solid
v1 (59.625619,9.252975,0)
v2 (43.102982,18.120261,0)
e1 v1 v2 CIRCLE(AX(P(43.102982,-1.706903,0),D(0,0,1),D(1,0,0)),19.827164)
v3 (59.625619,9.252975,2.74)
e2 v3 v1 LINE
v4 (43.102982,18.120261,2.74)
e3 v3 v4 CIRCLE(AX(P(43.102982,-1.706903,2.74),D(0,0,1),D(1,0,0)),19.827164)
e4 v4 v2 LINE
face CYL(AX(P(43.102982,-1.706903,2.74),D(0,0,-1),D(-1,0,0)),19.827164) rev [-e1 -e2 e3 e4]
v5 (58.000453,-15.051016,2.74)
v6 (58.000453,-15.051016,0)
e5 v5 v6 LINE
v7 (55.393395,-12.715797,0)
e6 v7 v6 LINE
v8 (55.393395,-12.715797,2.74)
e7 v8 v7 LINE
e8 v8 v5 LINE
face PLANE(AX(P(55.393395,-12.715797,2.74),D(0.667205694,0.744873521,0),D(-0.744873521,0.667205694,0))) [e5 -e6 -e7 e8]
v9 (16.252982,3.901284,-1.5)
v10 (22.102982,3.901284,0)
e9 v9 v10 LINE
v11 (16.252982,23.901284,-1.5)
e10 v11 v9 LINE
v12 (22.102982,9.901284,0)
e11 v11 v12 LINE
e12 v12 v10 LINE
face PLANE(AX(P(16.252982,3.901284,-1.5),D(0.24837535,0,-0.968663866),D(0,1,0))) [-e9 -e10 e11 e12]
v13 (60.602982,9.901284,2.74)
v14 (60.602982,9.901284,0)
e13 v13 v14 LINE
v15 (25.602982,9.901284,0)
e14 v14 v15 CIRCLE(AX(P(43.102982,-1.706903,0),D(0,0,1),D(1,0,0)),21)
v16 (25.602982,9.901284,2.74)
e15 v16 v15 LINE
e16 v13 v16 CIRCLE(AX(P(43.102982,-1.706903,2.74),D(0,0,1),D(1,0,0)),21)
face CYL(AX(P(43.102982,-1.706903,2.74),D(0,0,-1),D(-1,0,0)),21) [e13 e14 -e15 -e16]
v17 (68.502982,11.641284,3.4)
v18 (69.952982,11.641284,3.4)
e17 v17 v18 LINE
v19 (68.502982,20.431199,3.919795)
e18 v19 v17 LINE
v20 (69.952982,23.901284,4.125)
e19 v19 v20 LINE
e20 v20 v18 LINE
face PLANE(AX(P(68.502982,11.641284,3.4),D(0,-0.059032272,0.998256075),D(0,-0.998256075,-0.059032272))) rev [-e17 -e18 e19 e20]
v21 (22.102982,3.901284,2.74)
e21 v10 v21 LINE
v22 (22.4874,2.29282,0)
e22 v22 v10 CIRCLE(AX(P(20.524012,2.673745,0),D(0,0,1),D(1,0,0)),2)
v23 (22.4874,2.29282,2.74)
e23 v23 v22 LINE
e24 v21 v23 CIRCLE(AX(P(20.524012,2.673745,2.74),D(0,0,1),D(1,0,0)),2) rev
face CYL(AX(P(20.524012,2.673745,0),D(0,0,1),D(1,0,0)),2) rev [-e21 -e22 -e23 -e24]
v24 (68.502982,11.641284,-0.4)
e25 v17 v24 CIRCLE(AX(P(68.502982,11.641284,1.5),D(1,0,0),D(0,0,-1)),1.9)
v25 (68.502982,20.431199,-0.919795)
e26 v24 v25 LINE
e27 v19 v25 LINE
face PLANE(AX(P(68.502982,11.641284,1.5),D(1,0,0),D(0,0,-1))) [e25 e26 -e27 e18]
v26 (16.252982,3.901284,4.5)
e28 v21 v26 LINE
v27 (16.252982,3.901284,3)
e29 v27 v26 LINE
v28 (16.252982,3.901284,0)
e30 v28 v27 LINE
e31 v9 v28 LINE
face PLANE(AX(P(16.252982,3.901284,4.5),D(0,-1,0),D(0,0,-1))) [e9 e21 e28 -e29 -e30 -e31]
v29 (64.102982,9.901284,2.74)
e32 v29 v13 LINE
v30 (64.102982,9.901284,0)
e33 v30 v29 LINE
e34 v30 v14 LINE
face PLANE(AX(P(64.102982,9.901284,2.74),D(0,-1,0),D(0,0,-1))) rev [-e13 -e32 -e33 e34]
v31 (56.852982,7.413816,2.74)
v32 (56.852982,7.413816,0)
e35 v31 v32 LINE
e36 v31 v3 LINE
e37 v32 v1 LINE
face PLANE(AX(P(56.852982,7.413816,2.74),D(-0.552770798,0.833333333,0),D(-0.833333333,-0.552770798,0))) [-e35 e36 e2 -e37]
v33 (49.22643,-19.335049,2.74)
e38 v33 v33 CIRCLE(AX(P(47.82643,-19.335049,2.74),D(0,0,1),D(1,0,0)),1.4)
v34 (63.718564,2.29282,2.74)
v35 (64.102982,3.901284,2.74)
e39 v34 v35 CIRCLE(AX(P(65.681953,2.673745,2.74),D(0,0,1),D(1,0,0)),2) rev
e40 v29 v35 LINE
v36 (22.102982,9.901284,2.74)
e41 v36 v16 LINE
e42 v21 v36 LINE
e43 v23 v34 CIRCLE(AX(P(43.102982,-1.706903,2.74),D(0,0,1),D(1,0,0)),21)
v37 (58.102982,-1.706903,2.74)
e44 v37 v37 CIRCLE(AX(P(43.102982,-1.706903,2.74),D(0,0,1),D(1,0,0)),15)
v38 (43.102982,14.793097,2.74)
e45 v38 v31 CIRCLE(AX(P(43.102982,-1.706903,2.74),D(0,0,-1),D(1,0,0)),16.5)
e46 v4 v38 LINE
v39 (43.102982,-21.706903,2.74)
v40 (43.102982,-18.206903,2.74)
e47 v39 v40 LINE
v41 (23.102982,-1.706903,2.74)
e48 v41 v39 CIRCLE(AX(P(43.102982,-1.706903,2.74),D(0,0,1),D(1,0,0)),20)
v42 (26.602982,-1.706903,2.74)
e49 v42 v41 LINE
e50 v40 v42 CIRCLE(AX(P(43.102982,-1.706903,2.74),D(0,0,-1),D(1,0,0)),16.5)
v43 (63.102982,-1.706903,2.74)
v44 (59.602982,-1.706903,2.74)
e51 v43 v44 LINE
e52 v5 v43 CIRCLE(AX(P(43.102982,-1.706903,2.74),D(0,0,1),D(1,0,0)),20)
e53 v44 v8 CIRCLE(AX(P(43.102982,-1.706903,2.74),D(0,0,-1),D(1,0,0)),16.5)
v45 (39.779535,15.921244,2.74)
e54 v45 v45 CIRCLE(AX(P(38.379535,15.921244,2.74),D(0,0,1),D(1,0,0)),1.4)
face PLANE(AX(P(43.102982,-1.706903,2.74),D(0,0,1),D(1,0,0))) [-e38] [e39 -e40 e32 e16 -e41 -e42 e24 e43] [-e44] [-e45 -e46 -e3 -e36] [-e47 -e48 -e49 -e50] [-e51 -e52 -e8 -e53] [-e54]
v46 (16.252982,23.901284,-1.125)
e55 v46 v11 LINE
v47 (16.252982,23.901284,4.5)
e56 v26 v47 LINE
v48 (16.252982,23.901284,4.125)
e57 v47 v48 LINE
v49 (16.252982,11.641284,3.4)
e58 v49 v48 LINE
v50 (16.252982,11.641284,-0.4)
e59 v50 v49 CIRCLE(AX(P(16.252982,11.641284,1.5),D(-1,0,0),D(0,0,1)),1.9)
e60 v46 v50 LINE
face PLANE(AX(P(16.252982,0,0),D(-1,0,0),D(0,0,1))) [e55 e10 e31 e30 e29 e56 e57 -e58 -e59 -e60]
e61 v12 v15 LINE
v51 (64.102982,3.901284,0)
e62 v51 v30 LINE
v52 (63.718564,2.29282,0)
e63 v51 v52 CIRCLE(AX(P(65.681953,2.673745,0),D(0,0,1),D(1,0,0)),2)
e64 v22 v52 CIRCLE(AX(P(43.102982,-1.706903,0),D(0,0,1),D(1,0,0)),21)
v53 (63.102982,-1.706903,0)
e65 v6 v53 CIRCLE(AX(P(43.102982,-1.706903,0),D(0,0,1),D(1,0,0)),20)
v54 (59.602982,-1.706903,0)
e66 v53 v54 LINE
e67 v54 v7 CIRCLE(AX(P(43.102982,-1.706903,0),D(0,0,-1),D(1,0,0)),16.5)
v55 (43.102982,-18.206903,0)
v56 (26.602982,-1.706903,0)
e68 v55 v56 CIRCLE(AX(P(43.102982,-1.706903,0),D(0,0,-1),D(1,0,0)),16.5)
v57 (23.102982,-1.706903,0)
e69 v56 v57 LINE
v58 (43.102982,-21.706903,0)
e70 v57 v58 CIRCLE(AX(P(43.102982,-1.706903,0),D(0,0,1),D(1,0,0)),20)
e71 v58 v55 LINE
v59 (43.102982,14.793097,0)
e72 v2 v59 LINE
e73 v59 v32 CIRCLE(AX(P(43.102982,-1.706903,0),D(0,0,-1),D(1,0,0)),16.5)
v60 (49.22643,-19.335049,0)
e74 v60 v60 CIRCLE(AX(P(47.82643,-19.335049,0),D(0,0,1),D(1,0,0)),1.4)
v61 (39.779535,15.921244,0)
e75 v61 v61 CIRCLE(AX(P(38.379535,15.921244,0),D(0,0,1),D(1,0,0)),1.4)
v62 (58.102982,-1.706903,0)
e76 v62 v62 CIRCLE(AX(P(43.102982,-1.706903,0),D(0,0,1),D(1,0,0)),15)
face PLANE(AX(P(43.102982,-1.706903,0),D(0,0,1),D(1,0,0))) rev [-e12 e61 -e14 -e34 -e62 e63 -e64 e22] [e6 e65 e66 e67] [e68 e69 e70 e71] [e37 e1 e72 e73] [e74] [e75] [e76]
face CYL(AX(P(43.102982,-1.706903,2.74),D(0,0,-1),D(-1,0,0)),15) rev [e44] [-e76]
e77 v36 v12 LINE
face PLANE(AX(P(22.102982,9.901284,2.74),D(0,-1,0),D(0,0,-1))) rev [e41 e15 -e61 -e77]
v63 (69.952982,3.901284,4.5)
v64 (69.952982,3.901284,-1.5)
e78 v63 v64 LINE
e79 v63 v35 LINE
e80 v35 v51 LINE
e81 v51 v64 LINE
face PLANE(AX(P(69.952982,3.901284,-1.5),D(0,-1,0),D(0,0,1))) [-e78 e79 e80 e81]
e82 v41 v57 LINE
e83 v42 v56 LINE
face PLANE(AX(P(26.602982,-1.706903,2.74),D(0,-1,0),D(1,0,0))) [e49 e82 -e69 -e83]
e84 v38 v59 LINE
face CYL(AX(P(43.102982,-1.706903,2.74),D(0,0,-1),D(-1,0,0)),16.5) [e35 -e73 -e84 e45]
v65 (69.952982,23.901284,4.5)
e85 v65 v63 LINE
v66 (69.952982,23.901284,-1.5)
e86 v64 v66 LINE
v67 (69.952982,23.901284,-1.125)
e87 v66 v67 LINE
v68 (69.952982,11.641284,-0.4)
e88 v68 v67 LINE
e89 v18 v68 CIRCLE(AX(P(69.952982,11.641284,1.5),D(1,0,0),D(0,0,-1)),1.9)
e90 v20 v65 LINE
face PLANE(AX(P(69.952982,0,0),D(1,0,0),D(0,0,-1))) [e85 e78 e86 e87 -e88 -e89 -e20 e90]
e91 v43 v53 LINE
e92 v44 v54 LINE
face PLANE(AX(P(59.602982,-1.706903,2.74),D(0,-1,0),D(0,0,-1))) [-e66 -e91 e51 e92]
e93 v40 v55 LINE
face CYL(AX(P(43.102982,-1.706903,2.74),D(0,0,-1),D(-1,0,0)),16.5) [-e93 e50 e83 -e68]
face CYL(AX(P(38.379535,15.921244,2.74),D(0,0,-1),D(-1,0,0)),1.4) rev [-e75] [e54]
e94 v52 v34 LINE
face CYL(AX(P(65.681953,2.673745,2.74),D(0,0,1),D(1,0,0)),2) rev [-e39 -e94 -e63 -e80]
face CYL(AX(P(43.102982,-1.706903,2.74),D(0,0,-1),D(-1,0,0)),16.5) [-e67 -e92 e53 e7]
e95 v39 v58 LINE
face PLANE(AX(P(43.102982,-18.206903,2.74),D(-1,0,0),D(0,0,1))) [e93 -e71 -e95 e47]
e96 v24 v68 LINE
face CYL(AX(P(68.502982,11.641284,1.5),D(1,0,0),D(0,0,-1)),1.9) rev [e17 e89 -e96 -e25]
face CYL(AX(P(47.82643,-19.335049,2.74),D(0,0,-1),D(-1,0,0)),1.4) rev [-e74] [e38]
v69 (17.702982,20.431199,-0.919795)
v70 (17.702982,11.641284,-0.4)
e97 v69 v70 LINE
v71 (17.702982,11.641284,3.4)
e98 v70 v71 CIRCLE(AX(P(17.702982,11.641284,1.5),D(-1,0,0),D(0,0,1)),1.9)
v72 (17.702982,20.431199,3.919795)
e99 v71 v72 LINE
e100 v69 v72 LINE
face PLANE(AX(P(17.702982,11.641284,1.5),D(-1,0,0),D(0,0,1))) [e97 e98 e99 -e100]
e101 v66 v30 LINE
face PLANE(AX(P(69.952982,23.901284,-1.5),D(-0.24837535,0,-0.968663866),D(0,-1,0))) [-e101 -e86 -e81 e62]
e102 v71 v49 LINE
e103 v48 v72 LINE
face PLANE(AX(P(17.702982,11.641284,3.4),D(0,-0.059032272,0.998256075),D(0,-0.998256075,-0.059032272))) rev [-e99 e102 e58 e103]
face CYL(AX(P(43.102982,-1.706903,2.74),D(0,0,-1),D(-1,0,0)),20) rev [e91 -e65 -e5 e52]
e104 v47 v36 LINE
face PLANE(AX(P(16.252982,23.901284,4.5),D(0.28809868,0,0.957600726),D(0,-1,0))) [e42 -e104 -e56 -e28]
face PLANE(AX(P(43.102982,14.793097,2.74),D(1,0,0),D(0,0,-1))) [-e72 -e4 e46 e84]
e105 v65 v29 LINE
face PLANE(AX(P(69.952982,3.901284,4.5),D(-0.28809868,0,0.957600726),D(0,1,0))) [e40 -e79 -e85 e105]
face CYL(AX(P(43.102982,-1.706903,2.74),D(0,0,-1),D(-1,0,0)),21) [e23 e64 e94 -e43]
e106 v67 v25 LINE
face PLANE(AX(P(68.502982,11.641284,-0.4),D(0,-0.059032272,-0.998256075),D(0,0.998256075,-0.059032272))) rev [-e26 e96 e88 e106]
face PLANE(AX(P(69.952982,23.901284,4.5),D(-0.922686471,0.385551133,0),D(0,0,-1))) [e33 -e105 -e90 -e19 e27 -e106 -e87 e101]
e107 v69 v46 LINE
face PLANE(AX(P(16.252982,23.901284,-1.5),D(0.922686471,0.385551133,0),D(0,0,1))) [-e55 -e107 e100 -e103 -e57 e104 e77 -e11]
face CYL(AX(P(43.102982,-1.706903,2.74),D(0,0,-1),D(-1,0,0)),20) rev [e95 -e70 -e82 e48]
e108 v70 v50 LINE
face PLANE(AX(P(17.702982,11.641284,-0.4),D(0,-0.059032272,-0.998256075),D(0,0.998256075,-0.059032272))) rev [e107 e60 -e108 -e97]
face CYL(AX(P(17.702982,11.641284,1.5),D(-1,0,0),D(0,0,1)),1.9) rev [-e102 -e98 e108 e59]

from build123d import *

# Parameters (mm, degrees)
SKETCH_1_R          = 15
SKETCH_1_R_2        = 1.4
EXTRUDE_1_DEPTH     = 2.74
SKETCH_3_W          = 2.74
SKETCH_3_H          = 6
EXTRUDE_3_DEPTH     = 3.5
SKETCH_11_W         = 2.74
SKETCH_11_H         = 6
EXTRUDE_8_DEPTH     = 3.5
FILLET_17_R         = 2
FILLET_19_R         = 2
CUT_EXTRUDE_1_DEPTH = 1.45
CUT_EXTRUDE_START   = -1.45
CUT_EXTRUDE_2_DEPTH = 1.45


with BuildPart() as part:
    # 草图1 → 凸台-拉伸1 (new body)
    with BuildSketch(Plane.XY):
        with BuildLine():
            Line((25.602982383, 9.901284161), (25.602982383, 3.901284161))
            Line((25.602982383, 3.901284161), (22.865684115, 3.901284161))
            ThreePointArc((22.865684115, 3.901284161), (43.102982383, -22.706902605), (63.340280651, 3.901284161))
            Line((63.340280651, 3.901284161), (60.602982383, 3.901284161))
            Line((60.602982383, 3.901284161), (60.602982383, 9.901284161))
            ThreePointArc((60.602982383, 9.901284161), (43.102982383, 19.293097395), (25.602982383, 9.901284161))
        make_face()
        with Locations((43.102982383, -1.706902605)):
            Circle(SKETCH_1_R, mode=Mode.SUBTRACT)
        with Locations((38.37953481, 15.921243725)):
            Circle(SKETCH_1_R_2, mode=Mode.SUBTRACT)
        with Locations((47.826429956, -19.335048935)):
            Circle(SKETCH_1_R_2, mode=Mode.SUBTRACT)
        with BuildLine():
            Line((26.602982383, -1.706902605), (23.102982383, -1.706902605))
            ThreePointArc((23.102982383, -1.706902605), (28.96084676, -15.849038229), (43.102982383, -21.706902605))
            Line((43.102982383, -21.706902605), (43.102982383, -18.206902605))
            ThreePointArc((43.102982383, -18.206902605), (31.435720494, -13.374164495), (26.602982383, -1.706902605))
        make_face(mode=Mode.SUBTRACT)
        with BuildLine():
            Line((43.102982383, 14.793097395), (43.102982383, 18.12026115))
            ThreePointArc((43.102982383, 18.12026115), (52.478832846, 15.763353566), (59.625618846, 9.252974534))
            Line((59.625618846, 9.252974534), (56.852982383, 7.413815568))
            ThreePointArc((56.852982383, 7.413815568), (50.905486793, 12.831698598), (43.102982383, 14.793097395))
        make_face(mode=Mode.SUBTRACT)
        with BuildLine():
            Line((55.393395475, -12.715796557), (58.000452797, -15.051016486))
            ThreePointArc((58.000452797, -15.051016486), (61.783847035, -8.850101879), (63.102982383, -1.706902605))
            Line((63.102982383, -1.706902605), (59.602982383, -1.706902605))
            ThreePointArc((59.602982383, -1.706902605), (58.514695721, -7.600042006), (55.393395475, -12.715796557))
        make_face(mode=Mode.SUBTRACT)
    extrude(amount=EXTRUDE_1_DEPTH)

    # 草图3 → 凸台-拉伸3 (add)
    with BuildSketch(Plane.ZY.offset(-25.602982383)):
        with Locations((1.37, 6.901284161)):
            Rectangle(SKETCH_3_W, SKETCH_3_H)
    extrude(amount=EXTRUDE_3_DEPTH)

    # 草图11 → 凸台-拉伸8 (add)
    with BuildSketch(Plane(origin=(60.602982383, 0, 0), x_dir=(0, 0, -1), z_dir=(1, 0, 0))):
        with Locations((-1.37, 6.901284161)):
            Rectangle(SKETCH_11_W, SKETCH_11_H)
    extrude(amount=EXTRUDE_8_DEPTH)

    # 圆角17
    # the kernel refuses this fillet: 2 mm, written as the material it adds along each edge
    with BuildSketch(Plane(origin=(63.340280651, 3.901284161, 0), x_dir=(0.228936975336042, -0.9734412469810308, 0), z_dir=(0, 0, 1))) as fillet_17_piece_1:
        with BuildLine():
            CenterArc((1.731032211, 1.998451636), FILLET_17_R, 218.902952144, 48.842355981)
            Line((0.174610628, 0.742445325), (0.143482196, 0.717325199))
            ThreePointArc((0.143482196, 0.717325199), (0.048367664, 0.380380141), (-0.03893765, 0.009157479))
            Line((-0.03893765, 0.009157479), (0.001573666, -0.039969033))
            ThreePointArc((0.001573666, -0.039969033), (0.826174465, -0.023742177), (1.650775263, -0.039969033))
            Line((1.650775263, -0.039969033), (1.652348929, 0))
        make_face()
    extrude(amount=2.74)

    # 圆角19
    # the kernel refuses this fillet: 2 mm, written as the material it adds along each edge
    with BuildSketch(Plane(origin=(22.865684115, 3.901284161, 0), x_dir=(-0.22893697533604487, -0.9734412469810302, 0), z_dir=(0, 0, 1))) as fillet_19_piece_1:
        with BuildLine():
            CenterArc((1.731032211, -1.998451636), FILLET_19_R, 92.254691875, 48.842355981)
            Line((0.174610628, -0.742445325), (0.143482196, -0.717325199))
            ThreePointArc((0.143482196, -0.717325199), (0.048367664, -0.380380141), (-0.03893765, -0.009157479))
            Line((-0.03893765, -0.009157479), (0.001573666, 0.039969033))
            ThreePointArc((0.001573666, 0.039969033), (0.826174465, 0.023742177), (1.650775263, 0.039969033))
            Line((1.650775263, 0.039969033), (1.652348929, 0))
        make_face()
    extrude(amount=2.74)

    # 放样2: read off the stored shape, not the designer's step
    # 放样2: loft between two sections, ruled curve by curve
    loft_2_from = [
        Edge.make_line((64.102982383, 3.901284161, 2.74), (64.102982383, 3.901284161, 0)),
        Edge.make_line((64.102982383, 9.901284161, 2.74), (64.102982383, 3.901284161, 2.74)),
        Edge.make_line((64.102982383, 3.901284161, 0), (64.102982383, 9.901284161, 0)),
        Edge.make_line((64.102982383, 9.901284161, 0), (64.102982383, 9.901284161, 2.74)),
    ]
    loft_2_to = [
        Edge.make_line((69.952982383, 3.901284161, 4.5), (69.952982383, 3.901284161, -1.5)),
        Edge.make_line((69.952982383, 23.901284161, 4.5), (69.952982383, 3.901284161, 4.5)),
        Edge.make_line((69.952982383, 3.901284161, -1.5), (69.952982383, 23.901284161, -1.5)),
        Edge.make_line((69.952982383, 23.901284161, -1.5), (69.952982383, 23.901284161, 4.5)),
    ]
    loft_2 = Solid(Shell([*[Face.make_surface_from_curves(loft_2_from[k], loft_2_to[k]) for k in range(4)], Face(Wire(loft_2_from)), Face(Wire(loft_2_to))]))
    add(loft_2)

    # 草图31 → 切除-拉伸1 (cut)
    with BuildSketch(Plane(origin=(69.952982383, 0, 0), x_dir=(0, 0, -1), z_dir=(1, 0, 0))):
        with BuildLine():
            Line((-1.5, 23.901284161), (-4.125, 23.901284161))
            Line((-4.125, 23.901284161), (-3.4, 11.641284161))
            ThreePointArc((-3.4, 11.641284161), (-1.5, 9.741284161), (0.4, 11.641284161))
            Line((0.4, 11.641284161), (1.125, 23.901284161))
            Line((1.125, 23.901284161), (-1.5, 23.901284161))
        make_face()
    extrude(amount=-CUT_EXTRUDE_1_DEPTH, mode=Mode.SUBTRACT)

    # 放样3: read off the stored shape, not the designer's step
    # 放样3: loft between two sections, ruled curve by curve
    loft_3_from = [
        Edge.make_line((22.102982383, 9.901284161, 0), (22.102982383, 3.901284161, 0)),
        Edge.make_line((22.102982383, 3.901284161, 2.74), (22.102982383, 9.901284161, 2.74)),
        Edge.make_line((22.102982383, 3.901284161, 2.74), (22.102982383, 3.901284161, 0)),
        Edge.make_line((22.102982383, 9.901284161, 2.74), (22.102982383, 9.901284161, 0)),
    ]
    loft_3_to = [
        Edge.make_line((16.252982383, 23.901284161, -1.5), (16.252982383, 3.901284161, -1.5)),
        Edge.make_line((16.252982383, 3.901284161, 4.5), (16.252982383, 23.901284161, 4.5)),
        Edge.make_line((16.252982383, 3.901284161, 4.5), (16.252982383, 3.901284161, -1.5)),
        Edge.make_line((16.252982383, 23.901284161, 4.5), (16.252982383, 23.901284161, -1.5)),
    ]
    loft_3 = Solid(Shell([*[Face.make_surface_from_curves(loft_3_from[k], loft_3_to[k]) for k in range(4)], Face(Wire(loft_3_from)), Face(Wire(loft_3_to))]))
    add(loft_3)

    # 草图32 → 切除-拉伸2 (cut)
    with BuildSketch(Plane.ZY.offset(-16.252982383).offset(CUT_EXTRUDE_START)):
        with BuildLine():
            Line((1.5, 23.901284161), (-1.125, 23.901284161))
            Line((-1.125, 23.901284161), (-0.4, 11.641284161))
            ThreePointArc((-0.4, 11.641284161), (1.5, 9.741284161), (3.4, 11.641284161))
            Line((3.4, 11.641284161), (4.125, 23.901284161))
            Line((4.125, 23.901284161), (1.5, 23.901284161))
        make_face()
    extrude(amount=CUT_EXTRUDE_2_DEPTH, mode=Mode.SUBTRACT)


solid = part.part
